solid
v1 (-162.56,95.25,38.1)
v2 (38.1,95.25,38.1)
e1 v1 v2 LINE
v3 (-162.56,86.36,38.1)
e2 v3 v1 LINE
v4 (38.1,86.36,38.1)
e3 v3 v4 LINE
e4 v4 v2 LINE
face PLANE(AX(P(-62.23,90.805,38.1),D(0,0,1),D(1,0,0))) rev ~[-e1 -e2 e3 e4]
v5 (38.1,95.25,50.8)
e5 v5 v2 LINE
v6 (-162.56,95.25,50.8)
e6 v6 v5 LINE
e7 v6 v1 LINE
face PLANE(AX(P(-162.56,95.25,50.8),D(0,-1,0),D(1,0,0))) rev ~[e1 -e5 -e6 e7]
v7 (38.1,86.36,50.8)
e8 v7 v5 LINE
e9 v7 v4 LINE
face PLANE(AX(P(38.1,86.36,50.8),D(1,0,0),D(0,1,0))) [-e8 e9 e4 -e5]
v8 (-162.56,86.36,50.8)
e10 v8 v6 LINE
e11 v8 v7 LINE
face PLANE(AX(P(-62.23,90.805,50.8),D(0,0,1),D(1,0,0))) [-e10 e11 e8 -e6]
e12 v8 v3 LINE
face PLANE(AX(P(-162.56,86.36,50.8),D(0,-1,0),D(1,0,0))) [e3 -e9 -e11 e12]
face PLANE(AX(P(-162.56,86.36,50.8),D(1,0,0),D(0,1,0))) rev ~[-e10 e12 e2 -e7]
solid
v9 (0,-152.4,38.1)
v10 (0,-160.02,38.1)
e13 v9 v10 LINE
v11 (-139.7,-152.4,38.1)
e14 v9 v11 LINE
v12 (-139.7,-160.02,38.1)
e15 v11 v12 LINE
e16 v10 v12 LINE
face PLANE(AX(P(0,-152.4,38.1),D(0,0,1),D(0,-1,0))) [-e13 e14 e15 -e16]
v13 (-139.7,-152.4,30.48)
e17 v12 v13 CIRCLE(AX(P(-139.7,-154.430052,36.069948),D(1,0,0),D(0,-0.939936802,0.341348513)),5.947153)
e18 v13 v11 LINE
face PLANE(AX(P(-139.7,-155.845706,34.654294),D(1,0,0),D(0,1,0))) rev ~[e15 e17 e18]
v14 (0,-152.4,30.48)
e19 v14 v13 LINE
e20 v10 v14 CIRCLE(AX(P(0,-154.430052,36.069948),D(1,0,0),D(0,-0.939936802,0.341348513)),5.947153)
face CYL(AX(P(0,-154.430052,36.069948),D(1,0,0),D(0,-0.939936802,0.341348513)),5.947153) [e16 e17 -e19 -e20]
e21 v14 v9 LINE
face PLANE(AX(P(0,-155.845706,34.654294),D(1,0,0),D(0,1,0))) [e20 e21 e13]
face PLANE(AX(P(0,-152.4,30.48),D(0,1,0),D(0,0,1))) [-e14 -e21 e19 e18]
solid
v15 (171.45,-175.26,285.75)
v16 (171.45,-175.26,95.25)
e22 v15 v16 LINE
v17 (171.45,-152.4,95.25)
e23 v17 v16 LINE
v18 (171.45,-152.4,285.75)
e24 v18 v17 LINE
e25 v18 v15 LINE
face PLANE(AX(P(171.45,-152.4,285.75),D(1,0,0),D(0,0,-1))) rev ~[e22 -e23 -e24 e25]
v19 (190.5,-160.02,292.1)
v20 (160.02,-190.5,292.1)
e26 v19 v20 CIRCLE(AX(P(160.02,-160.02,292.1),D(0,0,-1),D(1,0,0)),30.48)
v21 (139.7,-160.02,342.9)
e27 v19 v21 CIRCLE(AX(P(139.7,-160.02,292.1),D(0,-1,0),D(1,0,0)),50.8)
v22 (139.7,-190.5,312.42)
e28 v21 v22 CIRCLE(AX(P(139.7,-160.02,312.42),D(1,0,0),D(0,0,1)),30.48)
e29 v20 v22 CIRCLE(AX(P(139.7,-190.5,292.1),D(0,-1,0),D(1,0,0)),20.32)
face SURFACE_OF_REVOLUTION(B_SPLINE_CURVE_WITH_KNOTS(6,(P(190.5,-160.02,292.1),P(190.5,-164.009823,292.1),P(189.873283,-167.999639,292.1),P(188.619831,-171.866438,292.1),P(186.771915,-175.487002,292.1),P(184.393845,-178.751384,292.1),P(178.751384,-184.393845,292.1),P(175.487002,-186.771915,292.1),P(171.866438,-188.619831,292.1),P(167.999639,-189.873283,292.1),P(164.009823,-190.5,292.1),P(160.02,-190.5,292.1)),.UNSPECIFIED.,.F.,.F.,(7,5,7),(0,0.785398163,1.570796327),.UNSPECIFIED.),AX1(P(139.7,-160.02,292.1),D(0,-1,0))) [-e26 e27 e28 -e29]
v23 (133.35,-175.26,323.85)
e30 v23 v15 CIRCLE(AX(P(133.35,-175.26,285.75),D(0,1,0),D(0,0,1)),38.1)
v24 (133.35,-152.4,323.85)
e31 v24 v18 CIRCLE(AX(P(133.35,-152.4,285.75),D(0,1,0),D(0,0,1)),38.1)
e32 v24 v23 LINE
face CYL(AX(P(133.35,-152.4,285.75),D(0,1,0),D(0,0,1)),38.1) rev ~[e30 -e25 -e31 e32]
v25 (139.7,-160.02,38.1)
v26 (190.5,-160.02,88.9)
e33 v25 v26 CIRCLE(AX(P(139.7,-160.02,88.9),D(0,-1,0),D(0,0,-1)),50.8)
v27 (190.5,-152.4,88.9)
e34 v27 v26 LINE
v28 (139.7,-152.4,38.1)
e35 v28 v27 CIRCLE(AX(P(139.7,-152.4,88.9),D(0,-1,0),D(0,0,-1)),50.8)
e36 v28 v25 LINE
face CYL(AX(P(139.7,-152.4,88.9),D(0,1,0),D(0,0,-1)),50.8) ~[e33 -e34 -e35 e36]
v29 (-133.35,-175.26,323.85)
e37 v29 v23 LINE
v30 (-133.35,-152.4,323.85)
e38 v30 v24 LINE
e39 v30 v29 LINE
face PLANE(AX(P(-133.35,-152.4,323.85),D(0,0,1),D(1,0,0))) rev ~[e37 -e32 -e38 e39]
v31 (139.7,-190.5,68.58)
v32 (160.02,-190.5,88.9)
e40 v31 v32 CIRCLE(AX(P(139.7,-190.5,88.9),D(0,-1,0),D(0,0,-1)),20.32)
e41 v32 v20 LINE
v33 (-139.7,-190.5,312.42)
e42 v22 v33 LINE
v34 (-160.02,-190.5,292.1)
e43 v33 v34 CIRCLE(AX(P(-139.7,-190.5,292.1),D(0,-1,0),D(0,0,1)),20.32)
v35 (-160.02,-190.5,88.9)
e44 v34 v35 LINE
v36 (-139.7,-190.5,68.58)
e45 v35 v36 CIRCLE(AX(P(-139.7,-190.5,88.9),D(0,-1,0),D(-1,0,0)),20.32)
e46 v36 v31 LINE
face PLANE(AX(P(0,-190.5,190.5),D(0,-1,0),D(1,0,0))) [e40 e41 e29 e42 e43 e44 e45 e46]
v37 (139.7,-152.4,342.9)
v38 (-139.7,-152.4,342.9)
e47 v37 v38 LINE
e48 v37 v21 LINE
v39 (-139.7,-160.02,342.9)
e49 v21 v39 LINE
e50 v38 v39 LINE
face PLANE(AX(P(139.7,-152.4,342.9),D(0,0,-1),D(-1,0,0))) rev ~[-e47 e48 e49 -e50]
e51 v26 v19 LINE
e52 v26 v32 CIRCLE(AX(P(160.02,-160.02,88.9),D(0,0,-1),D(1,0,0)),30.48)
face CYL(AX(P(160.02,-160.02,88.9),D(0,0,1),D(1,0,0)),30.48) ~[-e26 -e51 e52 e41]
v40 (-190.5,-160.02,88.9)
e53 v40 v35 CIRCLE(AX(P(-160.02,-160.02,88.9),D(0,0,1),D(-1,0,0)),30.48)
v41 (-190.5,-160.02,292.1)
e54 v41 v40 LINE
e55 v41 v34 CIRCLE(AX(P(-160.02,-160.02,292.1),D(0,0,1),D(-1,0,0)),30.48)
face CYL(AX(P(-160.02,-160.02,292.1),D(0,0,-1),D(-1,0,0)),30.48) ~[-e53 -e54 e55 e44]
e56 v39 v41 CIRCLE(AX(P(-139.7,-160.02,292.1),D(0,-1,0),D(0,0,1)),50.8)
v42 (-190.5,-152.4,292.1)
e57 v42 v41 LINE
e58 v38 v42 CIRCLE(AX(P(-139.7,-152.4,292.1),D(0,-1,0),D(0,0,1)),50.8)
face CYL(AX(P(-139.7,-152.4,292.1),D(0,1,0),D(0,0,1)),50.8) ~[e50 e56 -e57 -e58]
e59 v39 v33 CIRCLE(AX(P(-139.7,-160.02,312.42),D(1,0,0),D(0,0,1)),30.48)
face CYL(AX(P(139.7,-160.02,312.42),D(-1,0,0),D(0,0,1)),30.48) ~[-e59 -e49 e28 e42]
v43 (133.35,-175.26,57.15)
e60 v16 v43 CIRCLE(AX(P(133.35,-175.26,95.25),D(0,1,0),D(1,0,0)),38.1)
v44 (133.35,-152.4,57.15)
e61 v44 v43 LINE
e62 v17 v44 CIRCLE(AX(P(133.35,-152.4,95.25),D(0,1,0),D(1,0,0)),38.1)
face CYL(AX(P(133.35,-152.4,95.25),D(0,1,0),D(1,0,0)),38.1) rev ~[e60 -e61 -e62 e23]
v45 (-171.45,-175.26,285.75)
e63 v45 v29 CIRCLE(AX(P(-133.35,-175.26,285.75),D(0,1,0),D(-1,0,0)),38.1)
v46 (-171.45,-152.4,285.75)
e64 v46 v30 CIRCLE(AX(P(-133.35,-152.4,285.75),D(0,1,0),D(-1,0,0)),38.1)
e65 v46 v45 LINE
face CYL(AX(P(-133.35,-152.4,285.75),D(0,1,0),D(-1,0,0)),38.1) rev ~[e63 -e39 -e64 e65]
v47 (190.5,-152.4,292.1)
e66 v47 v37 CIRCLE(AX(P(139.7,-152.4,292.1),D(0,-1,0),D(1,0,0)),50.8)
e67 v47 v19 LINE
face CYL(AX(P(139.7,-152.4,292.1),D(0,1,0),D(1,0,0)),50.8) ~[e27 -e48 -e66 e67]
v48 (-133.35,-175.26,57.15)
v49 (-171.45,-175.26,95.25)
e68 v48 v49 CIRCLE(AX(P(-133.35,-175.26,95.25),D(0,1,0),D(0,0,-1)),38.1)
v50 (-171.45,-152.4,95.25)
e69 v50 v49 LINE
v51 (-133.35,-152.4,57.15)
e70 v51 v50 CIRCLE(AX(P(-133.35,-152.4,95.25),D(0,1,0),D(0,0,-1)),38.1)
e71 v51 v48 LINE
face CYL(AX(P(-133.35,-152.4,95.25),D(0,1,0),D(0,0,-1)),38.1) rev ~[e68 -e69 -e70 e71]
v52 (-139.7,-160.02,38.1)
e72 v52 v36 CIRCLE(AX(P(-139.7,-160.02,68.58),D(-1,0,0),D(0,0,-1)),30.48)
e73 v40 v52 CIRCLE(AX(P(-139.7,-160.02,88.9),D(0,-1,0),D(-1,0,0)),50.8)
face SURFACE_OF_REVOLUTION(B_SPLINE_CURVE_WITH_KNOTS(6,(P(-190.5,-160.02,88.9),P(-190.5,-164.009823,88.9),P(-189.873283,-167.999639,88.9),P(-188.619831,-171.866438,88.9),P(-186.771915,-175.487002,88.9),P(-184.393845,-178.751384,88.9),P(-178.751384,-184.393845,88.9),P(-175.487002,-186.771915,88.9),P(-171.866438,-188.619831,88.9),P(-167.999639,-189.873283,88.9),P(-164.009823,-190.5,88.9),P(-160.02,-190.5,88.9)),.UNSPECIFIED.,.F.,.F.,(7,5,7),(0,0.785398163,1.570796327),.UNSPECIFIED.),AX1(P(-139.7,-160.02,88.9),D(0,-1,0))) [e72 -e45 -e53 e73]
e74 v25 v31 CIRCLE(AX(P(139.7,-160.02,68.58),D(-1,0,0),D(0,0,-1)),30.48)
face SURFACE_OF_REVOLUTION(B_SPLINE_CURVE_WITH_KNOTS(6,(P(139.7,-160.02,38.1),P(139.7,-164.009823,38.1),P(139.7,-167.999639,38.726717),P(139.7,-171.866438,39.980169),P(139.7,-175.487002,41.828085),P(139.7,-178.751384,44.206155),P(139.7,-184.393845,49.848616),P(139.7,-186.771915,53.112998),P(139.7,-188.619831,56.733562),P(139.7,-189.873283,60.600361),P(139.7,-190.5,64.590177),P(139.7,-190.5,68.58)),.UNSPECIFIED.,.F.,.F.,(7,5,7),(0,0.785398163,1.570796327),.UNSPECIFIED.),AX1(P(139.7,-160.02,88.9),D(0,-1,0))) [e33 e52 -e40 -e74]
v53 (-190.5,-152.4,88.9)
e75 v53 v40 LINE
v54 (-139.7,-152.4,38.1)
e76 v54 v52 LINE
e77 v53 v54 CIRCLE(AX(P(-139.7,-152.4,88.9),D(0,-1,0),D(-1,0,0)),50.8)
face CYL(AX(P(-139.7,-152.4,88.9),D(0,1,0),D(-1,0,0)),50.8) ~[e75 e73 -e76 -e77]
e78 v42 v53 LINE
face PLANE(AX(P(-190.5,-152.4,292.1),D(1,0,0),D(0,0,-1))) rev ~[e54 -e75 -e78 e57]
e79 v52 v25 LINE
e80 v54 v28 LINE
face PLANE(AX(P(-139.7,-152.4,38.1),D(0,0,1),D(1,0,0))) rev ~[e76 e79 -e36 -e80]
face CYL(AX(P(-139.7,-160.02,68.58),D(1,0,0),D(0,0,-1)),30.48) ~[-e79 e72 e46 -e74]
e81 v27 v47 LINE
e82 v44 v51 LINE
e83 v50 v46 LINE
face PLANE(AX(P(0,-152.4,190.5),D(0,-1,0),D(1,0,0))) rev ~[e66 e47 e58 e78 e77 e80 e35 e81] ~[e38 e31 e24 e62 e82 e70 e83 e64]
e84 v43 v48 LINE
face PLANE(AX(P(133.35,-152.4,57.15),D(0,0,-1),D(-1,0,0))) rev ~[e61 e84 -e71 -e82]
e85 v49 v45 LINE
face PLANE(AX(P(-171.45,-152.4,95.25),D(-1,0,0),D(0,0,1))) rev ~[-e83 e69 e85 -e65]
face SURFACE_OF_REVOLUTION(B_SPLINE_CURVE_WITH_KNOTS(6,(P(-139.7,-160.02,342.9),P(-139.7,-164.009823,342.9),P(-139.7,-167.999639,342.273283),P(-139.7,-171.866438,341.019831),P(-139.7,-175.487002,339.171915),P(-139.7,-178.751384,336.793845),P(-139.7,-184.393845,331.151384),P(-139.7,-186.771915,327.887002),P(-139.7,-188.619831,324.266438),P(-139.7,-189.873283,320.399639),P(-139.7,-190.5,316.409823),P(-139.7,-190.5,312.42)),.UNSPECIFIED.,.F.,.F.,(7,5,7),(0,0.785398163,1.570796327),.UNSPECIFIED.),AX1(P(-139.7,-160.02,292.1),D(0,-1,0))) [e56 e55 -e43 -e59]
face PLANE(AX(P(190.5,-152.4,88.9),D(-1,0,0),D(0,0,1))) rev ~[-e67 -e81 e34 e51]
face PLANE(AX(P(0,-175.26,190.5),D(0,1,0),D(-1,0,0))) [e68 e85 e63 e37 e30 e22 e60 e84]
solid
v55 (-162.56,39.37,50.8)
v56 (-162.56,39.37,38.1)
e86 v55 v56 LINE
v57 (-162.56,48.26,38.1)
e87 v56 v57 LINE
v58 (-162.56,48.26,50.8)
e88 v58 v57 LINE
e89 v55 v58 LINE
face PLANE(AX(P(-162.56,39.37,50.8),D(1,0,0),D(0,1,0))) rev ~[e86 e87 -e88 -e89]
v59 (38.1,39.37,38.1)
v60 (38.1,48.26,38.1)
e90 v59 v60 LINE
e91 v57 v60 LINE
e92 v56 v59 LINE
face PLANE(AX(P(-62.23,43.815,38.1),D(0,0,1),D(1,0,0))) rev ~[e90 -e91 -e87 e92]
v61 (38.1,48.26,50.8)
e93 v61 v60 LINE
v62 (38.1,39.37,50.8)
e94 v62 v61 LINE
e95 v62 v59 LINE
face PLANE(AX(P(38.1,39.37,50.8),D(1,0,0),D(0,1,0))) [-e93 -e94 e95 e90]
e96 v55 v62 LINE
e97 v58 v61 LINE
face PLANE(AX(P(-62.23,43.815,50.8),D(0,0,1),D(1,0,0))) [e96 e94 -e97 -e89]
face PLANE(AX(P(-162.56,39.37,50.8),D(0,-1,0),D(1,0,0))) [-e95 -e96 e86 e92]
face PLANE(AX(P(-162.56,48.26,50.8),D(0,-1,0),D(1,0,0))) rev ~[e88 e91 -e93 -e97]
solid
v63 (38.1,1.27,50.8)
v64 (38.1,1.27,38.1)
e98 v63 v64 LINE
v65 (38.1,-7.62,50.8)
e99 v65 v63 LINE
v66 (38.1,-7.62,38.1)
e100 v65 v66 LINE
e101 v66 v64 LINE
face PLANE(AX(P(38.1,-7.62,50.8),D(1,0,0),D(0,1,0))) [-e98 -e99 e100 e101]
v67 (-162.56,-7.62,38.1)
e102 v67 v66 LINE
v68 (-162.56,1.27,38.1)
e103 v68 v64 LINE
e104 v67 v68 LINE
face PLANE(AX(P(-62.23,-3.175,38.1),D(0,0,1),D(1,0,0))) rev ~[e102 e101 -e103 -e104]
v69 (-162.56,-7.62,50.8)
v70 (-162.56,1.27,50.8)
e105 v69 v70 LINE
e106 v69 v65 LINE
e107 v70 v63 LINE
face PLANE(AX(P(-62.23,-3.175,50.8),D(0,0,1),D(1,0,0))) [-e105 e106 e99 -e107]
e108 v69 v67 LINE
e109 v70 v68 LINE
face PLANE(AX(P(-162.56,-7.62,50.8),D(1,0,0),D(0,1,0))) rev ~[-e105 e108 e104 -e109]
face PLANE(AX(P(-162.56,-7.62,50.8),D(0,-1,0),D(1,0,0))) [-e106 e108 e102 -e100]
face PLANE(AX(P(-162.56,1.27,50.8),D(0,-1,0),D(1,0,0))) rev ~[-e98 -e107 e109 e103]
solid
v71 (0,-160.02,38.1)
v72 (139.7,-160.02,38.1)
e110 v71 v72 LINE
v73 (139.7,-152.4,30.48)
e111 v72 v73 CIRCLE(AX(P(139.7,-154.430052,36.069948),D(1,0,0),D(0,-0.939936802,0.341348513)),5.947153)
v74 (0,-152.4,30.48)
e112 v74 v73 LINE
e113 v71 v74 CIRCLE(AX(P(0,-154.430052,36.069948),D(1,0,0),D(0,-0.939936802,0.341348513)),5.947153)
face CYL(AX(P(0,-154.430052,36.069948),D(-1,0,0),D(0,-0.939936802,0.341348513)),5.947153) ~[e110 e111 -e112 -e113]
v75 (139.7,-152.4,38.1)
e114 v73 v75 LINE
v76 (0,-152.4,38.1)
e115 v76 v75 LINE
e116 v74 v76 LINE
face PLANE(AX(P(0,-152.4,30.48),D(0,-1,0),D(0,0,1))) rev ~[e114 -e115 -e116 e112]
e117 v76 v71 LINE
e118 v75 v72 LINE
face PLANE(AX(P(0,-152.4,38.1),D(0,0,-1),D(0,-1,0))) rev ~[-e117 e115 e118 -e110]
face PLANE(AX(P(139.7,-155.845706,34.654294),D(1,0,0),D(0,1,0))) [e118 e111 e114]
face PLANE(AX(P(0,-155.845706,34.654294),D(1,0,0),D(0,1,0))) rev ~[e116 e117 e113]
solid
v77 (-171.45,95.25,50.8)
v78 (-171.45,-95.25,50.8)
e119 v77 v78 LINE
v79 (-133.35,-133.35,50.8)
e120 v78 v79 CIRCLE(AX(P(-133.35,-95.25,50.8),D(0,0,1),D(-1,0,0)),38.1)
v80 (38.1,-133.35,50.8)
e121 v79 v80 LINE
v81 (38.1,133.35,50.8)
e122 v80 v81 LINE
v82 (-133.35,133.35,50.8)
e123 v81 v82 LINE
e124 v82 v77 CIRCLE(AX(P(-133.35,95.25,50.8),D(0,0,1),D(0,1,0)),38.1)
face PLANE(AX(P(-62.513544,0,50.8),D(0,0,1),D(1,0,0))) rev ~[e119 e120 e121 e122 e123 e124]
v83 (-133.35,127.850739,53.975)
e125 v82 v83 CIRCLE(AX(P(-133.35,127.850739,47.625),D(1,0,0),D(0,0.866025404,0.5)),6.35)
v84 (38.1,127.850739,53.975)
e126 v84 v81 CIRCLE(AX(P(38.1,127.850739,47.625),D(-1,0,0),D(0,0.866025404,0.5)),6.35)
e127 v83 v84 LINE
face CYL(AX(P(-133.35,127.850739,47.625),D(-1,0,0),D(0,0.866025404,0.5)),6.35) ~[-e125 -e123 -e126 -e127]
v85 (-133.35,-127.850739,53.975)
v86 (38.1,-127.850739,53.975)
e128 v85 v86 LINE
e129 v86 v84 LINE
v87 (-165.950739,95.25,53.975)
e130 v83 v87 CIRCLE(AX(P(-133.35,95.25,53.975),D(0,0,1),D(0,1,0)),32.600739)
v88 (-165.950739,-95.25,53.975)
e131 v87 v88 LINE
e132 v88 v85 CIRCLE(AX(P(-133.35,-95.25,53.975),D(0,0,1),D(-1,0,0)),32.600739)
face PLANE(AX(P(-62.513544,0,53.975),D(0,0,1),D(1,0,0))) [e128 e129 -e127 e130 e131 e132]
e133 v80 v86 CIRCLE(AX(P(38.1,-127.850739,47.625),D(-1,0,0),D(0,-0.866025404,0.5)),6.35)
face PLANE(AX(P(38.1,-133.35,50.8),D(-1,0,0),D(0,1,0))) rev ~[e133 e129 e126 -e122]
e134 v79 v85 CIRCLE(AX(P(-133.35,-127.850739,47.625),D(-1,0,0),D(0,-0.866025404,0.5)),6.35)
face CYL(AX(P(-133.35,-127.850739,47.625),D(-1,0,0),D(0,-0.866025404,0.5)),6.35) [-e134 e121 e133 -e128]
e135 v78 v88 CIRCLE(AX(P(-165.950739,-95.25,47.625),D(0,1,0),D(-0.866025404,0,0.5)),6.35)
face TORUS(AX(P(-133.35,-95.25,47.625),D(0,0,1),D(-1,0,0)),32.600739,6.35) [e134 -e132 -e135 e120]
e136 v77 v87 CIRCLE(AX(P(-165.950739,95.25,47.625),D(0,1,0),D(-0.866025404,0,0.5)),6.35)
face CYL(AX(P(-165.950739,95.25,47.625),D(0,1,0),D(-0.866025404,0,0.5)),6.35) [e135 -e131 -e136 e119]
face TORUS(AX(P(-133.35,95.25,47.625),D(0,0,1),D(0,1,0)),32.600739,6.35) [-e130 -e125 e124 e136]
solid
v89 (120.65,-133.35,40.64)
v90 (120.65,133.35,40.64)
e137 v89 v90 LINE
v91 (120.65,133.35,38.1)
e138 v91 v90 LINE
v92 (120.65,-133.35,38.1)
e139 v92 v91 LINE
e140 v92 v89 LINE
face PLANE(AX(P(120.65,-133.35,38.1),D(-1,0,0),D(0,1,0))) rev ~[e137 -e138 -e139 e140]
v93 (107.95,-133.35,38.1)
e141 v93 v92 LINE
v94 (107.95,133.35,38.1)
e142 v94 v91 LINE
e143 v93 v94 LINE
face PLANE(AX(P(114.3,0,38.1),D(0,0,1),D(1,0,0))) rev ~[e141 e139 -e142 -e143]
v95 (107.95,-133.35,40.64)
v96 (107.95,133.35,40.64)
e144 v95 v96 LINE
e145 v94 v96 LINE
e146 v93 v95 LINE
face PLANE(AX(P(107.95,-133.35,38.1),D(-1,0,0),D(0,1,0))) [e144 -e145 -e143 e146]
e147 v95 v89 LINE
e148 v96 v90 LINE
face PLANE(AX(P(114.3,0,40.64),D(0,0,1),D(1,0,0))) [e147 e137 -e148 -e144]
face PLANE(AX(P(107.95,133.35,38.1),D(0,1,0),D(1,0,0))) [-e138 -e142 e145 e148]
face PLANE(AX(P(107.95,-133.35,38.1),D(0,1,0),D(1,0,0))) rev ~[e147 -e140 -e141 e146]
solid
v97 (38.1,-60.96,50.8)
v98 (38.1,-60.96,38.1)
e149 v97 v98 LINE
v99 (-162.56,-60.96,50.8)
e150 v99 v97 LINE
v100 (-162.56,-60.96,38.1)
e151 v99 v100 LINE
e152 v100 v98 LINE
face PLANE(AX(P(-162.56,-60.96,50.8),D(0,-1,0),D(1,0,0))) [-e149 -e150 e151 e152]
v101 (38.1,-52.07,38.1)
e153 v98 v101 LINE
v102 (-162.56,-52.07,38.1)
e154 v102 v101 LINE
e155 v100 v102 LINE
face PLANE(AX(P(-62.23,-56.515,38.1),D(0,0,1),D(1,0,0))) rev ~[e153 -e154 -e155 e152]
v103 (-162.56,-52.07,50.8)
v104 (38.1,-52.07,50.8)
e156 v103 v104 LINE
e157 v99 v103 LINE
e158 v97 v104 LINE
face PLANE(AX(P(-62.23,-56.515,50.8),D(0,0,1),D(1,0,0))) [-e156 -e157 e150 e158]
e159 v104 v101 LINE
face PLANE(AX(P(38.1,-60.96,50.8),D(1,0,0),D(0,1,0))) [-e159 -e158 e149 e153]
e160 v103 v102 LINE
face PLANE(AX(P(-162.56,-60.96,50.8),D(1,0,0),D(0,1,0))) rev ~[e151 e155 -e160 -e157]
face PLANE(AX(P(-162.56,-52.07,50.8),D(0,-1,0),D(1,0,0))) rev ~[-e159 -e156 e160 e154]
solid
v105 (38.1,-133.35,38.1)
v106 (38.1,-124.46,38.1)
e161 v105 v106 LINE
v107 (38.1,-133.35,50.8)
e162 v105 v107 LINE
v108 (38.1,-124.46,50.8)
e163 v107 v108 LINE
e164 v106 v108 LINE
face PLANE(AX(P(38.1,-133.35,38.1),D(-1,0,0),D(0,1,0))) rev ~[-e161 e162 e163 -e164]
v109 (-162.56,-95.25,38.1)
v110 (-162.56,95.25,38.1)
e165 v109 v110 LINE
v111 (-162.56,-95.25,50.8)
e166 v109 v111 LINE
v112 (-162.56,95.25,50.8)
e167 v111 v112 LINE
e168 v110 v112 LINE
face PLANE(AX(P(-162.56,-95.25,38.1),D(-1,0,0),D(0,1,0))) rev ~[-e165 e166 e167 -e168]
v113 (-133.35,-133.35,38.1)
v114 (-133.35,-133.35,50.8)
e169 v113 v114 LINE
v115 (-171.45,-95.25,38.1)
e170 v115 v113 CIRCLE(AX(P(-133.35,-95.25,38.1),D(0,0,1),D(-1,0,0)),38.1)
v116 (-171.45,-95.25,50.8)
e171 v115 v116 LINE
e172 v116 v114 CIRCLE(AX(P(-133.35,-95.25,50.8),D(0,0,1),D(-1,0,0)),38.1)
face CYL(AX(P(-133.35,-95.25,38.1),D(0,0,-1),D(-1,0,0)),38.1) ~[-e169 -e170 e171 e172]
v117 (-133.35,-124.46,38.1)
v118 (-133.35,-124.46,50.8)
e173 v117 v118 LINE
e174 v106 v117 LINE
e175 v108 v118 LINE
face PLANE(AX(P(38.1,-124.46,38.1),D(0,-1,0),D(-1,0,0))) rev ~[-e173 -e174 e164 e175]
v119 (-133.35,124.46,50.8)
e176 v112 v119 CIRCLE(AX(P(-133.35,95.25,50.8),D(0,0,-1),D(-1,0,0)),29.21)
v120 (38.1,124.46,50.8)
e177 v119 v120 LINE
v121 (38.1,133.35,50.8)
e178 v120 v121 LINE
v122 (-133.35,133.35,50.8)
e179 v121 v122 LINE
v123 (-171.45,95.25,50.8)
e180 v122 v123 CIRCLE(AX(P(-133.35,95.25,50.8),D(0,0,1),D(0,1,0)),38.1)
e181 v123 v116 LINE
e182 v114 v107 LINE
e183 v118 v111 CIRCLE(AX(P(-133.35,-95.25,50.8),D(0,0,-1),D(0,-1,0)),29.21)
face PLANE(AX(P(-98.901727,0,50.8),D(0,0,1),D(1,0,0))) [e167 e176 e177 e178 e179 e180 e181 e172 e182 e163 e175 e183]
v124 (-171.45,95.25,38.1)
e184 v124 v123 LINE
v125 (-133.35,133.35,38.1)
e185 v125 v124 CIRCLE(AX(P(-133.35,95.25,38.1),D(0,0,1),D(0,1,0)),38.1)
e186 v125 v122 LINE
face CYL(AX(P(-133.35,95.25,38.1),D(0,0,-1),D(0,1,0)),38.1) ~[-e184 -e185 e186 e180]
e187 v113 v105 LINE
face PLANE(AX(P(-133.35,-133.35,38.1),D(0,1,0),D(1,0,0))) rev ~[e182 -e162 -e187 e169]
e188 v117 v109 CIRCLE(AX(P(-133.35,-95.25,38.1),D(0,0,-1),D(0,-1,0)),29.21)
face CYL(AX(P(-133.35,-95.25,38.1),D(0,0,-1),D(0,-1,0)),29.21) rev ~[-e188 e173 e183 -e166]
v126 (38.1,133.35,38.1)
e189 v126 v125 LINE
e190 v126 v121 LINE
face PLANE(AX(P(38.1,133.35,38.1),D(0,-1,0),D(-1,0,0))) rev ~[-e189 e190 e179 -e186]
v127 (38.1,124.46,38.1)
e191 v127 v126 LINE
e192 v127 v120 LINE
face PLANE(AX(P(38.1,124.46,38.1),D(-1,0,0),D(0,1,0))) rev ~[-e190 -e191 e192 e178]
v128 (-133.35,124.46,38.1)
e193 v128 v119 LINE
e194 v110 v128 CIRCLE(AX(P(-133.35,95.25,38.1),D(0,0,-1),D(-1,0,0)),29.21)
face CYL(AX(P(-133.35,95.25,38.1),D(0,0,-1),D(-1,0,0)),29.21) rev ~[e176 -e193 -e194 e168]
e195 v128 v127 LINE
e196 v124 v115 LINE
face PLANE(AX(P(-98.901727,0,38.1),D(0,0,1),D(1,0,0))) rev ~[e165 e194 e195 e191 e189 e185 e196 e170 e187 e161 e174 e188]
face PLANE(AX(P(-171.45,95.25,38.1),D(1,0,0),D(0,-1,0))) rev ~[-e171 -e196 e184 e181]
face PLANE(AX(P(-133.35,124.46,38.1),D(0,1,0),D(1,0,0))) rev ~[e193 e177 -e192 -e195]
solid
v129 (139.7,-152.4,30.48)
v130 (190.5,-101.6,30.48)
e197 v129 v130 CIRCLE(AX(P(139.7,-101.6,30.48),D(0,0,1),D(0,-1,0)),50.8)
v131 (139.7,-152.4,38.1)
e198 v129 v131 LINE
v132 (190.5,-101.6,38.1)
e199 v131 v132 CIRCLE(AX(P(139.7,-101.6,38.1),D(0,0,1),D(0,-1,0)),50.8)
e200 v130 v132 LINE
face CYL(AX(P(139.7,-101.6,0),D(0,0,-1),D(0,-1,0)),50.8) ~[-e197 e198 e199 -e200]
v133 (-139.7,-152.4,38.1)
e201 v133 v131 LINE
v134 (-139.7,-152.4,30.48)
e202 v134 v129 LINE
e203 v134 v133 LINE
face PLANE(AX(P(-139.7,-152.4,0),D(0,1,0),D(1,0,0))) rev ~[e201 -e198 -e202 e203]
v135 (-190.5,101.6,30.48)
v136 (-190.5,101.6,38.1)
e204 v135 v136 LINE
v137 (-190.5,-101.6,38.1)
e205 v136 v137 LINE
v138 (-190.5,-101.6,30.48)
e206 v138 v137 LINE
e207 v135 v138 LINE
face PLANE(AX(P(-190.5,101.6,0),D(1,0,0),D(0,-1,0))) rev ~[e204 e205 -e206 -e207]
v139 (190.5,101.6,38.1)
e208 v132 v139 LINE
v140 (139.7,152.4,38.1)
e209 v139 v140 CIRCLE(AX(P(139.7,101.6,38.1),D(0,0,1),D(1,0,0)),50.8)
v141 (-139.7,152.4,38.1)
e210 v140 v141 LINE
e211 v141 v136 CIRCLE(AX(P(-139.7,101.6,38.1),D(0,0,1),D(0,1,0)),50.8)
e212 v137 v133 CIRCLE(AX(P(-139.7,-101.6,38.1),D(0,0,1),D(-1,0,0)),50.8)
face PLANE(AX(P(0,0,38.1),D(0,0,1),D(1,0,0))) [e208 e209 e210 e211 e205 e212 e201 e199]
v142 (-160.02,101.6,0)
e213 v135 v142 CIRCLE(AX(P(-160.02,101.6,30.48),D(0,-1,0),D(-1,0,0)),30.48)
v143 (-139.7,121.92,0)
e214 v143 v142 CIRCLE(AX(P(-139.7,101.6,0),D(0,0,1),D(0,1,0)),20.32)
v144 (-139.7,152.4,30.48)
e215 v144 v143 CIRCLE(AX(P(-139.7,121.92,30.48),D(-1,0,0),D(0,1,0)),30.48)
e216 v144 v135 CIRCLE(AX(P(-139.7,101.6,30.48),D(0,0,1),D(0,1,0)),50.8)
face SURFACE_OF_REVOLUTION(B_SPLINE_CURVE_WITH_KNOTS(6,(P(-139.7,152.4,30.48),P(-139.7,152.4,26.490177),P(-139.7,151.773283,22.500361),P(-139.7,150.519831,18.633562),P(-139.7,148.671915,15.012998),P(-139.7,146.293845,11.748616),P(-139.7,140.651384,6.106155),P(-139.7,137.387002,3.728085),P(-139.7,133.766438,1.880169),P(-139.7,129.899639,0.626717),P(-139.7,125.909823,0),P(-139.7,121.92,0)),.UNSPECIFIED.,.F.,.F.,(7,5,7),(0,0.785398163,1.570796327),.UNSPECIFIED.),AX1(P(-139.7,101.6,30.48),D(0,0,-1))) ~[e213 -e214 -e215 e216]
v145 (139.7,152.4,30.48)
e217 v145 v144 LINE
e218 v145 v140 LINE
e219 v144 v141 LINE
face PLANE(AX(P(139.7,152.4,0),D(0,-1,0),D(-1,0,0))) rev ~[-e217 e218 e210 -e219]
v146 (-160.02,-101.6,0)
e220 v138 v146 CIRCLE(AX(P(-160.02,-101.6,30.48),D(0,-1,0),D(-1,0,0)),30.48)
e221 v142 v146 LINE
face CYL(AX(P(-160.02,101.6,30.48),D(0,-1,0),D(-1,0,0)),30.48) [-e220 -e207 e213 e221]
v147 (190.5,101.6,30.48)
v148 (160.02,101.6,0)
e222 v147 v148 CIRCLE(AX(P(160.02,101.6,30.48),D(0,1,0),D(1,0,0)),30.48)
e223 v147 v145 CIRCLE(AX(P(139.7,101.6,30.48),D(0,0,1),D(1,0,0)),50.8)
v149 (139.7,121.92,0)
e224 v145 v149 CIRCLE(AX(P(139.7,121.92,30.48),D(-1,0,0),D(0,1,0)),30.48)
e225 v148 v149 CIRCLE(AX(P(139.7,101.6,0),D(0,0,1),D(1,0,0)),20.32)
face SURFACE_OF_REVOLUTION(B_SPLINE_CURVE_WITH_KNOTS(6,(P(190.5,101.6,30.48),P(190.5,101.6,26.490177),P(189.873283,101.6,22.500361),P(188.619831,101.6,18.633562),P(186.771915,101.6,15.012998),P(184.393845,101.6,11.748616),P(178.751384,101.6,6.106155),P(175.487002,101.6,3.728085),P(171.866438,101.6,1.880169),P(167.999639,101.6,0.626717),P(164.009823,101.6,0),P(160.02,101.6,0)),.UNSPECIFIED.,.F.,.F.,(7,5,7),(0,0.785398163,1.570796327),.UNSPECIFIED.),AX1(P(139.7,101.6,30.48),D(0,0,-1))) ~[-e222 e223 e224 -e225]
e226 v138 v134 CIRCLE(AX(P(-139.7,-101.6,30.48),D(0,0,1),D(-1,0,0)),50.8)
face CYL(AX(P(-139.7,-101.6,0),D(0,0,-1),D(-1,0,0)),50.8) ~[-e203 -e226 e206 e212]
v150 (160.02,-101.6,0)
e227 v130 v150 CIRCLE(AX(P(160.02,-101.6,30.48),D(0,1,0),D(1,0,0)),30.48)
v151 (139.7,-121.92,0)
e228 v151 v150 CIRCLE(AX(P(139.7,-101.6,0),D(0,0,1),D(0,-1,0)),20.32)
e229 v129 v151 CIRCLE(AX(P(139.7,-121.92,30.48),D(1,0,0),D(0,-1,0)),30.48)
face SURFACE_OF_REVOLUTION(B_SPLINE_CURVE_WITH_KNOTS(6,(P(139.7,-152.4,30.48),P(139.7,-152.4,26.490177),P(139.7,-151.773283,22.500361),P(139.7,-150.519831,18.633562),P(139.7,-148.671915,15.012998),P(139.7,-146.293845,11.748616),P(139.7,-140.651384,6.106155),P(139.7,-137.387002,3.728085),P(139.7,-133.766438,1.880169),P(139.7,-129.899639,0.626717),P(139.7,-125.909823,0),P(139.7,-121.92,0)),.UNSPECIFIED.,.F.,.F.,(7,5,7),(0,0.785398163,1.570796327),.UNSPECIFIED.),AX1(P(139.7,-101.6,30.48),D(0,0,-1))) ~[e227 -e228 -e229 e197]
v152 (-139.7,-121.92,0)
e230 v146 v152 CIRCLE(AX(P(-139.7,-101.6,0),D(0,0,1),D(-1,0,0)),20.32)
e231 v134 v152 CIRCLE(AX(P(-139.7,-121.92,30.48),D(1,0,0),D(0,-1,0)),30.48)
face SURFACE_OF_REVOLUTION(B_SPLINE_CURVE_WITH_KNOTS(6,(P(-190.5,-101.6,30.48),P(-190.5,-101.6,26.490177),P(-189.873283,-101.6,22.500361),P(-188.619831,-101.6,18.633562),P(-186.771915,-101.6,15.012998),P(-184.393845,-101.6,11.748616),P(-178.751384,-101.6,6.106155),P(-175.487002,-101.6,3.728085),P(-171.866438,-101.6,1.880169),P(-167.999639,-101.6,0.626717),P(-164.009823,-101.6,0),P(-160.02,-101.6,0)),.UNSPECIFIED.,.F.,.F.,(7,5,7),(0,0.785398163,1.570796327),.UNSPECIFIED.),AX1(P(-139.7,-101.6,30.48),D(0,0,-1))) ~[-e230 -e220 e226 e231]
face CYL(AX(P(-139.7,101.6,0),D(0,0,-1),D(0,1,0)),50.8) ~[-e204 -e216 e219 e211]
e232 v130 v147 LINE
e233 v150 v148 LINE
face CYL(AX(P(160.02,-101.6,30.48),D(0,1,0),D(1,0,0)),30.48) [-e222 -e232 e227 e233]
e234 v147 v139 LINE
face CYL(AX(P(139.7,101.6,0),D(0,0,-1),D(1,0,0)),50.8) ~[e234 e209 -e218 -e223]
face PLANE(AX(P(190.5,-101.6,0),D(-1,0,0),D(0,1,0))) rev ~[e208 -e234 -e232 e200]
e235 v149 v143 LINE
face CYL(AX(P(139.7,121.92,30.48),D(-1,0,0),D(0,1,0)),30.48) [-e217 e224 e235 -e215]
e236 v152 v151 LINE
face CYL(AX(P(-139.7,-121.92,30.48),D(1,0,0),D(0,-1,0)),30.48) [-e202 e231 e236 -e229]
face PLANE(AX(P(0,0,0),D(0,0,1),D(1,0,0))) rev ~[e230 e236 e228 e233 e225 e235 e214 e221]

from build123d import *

# Parameters (mm, degrees)
F1_DEPTH     = 38.1
F2_R         = 30.48
F4_DEPTH     = 38.1
F5_R         = 30.48
F7_DEPTH     = 139.7
F8_DEPTH     = 139.7
F10_DEPTH    = 22.86
F13_DEPTH    = 12.7
F14_W        = 200.66
F14_H        = 8.89
F15_DEPTH    = 12.7
F17_DEPTH    = 3.175
F18_T1_DEPTH = 190.5
F18_T3_DEPTH = 185.1981532851
F18_T6_ANGLE = 90
F18_T8_ANGLE = 90
F19_W        = 12.7
F19_H        = 266.7
F20_DEPTH    = 2.54


# Not quite as in the source:
# - a fillet or chamfer that OpenCascade refuses, or shapes differently, is made with other operations: its cross-section is extruded or revolved along the edge and cut away or added
# - a length typed as a fraction of an inch, garbled in the dataset ("3 / 203.2 mm" for 3/8 in), is restored


with BuildPart() as f1:
    # F0 (on Top) → F1 (new body)
    with BuildSketch(Plane.XY):
        with BuildLine():
            Line((-139.7, -152.4), (139.7, -152.4))
            ThreePointArc((139.7, -152.4), (175.6210244843, -137.5210244843), (190.5, -101.6))
            Line((190.5, -101.6), (190.5, 101.6))
            ThreePointArc((190.5, 101.6), (175.6210244843, 137.5210244843), (139.7, 152.4))
            Line((139.7, 152.4), (-139.7, 152.4))
            ThreePointArc((-139.7, 152.4), (-175.6210244843, 137.5210244843), (-190.5, 101.6))
            Line((-190.5, 101.6), (-190.5, -101.6))
            ThreePointArc((-190.5, -101.6), (-175.6210244843, -137.5210244843), (-139.7, -152.4))
        make_face()
    extrude(amount=F1_DEPTH)

    # F2
    f2_edges = [f1.edges().sort_by_distance(p)[0] for p in [
        (0, -152.4, 0),
    ]]
    fillet(f2_edges, radius=F2_R)


with BuildPart() as f4:
    # F3 (on face) → F4 (new body)
    with BuildSketch(Plane.XZ.offset(152.4)):
        with BuildLine():
            Line((139.7, 342.9), (-139.7, 342.9))
            ThreePointArc((-139.7, 342.9), (-175.6210244843, 328.0210244843), (-190.5, 292.1))
            Line((-190.5, 292.1), (-190.5, 88.9))
            ThreePointArc((-190.5, 88.9), (-175.6210244843, 52.9789755157), (-139.7, 38.1))
            Line((-139.7, 38.1), (139.7, 38.1))
            ThreePointArc((139.7, 38.1), (175.6210244843, 52.9789755157), (190.5, 88.9))
            Line((190.5, 88.9), (190.5, 292.1))
            ThreePointArc((190.5, 292.1), (175.6210244843, 328.0210244843), (139.7, 342.9))
        make_face()
    extrude(amount=F4_DEPTH)

    # F5
    f5_edges = [f4.edges().sort_by_distance(p)[0] for p in [
        (-190.5, -190.5, 190.5),
        (0, -190.5, 342.9),
        (-175.621024, -190.5, 328.021024),
        (-175.621024, -190.5, 52.978976),
        (0, -190.5, 38.1),
        (175.621024, -190.5, 52.978976),
        (190.5, -190.5, 190.5),
        (175.621024, -190.5, 328.021024),
    ]]
    fillet(f5_edges, radius=F5_R)

    # F9 (on face) → F10 (cut)
    with BuildSketch(Plane(origin=(0, -152.4, 0), x_dir=(-1, 0, 0), z_dir=(0, 1, 0))):
        with BuildLine():
            Line((-133.35, 57.15), (133.35, 57.15))
            ThreePointArc((133.35, 57.15), (160.2907683632, 68.3092316368), (171.45, 95.25))
            Line((171.45, 95.25), (171.45, 285.75))
            ThreePointArc((171.45, 285.75), (160.2907683632, 312.6907683632), (133.35, 323.85))
            Line((133.35, 323.85), (-133.35, 323.85))
            ThreePointArc((-133.35, 323.85), (-160.2907683632, 312.6907683632), (-171.45, 285.75))
            Line((-171.45, 285.75), (-171.45, 95.25))
            ThreePointArc((-171.45, 95.25), (-160.2907683632, 68.3092316368), (-133.35, 57.15))
        make_face()
    extrude(amount=-F10_DEPTH, mode=Mode.SUBTRACT)


with BuildPart() as f7:
    # F6 (on Right) → F7 (new body)
    with BuildSketch(Plane.YZ):
        with BuildLine():
            Line((-152.4, 38.1), (-160.02, 38.1))
            ThreePointArc((-160.02, 38.1), (-158.6353242061, 31.8646757939), (-152.4, 30.48))
            Line((-152.4, 30.48), (-152.4, 38.1))
        make_face()
    extrude(amount=F7_DEPTH)


with BuildPart() as f8:
    # F8 (new): a face of the model
    f8_faces = [f7.part.faces().sort_by_distance(p)[0] for p in [
        (0, -156.0235310769, 34.4764689231),
    ]]
    extrude(f8_faces, amount=F8_DEPTH)


with BuildPart() as f13:
    # F12 (on face) → F13 (new body)
    with BuildSketch(Plane.XY.offset(38.1)):
        with BuildLine():
            Line((38.1, 133.35), (-133.35, 133.35))
            ThreePointArc((-133.35, 133.35), (-160.2907683632, 122.1907683632), (-171.45, 95.25))
            Line((-171.45, 95.25), (-171.45, -95.25))
            ThreePointArc((-171.45, -95.25), (-160.2907683632, -122.1907683632), (-133.35, -133.35))
            Line((-133.35, -133.35), (38.1, -133.35))
            Line((38.1, -133.35), (38.1, -124.46))
            Line((38.1, -124.46), (-133.35, -124.46))
            ThreePointArc((-133.35, -124.46), (-154.0045890785, -115.9045890785), (-162.56, -95.25))
            Line((-162.56, -95.25), (-162.56, 95.25))
            ThreePointArc((-162.56, 95.25), (-154.0045890785, 115.9045890785), (-133.35, 124.46))
            Line((-133.35, 124.46), (38.1, 124.46))
            Line((38.1, 124.46), (38.1, 133.35))
        make_face()
    extrude(amount=F13_DEPTH)


with BuildPart() as f15:
    # F14 (on face) → F15 (new body)
    with BuildSketch(Plane.XY.offset(50.8)):
        with Locations((-62.23, 90.805)):
            Rectangle(F14_W, F14_H)
    extrude(amount=-F15_DEPTH)


with BuildPart() as f15b:
    # F14 (on face) → F15, piece 2 (new body)
    with BuildSketch(Plane.XY.offset(50.8)):
        with Locations((-62.23, 43.815)):
            Rectangle(F14_W, F14_H)
    extrude(amount=-F15_DEPTH)


with BuildPart() as f15c:
    # F14 (on face) → F15, piece 3 (new body)
    with BuildSketch(Plane.XY.offset(50.8)):
        with Locations((-62.23, -3.175)):
            Rectangle(F14_W, F14_H)
    extrude(amount=-F15_DEPTH)


with BuildPart() as f15d:
    # F14 (on face) → F15, piece 4 (new body)
    with BuildSketch(Plane.XY.offset(50.8)):
        with Locations((-62.23, -56.515)):
            Rectangle(F14_W, F14_H)
    extrude(amount=-F15_DEPTH)


with BuildPart() as f17:
    # F16 (on face) → F17 (new body)
    with BuildSketch(Plane.XY.offset(50.8)):
        with BuildLine():
            Line((38.1, -133.35), (38.1, 133.35))
            Line((38.1, 133.35), (-133.35, 133.35))
            ThreePointArc((-133.35, 133.35), (-160.2907683632, 122.1907683632), (-171.45, 95.25))
            Line((-171.45, 95.25), (-171.45, -95.25))
            ThreePointArc((-171.45, -95.25), (-160.2907683632, -122.1907683632), (-133.35, -133.35))
            Line((-133.35, -133.35), (38.1, -133.35))
        make_face()
    extrude(amount=F17_DEPTH)

    # F18: fillet of radius 6.35 on 1 edges, made by hand

    # F18_s2 → F18_t1 (cut)
    with BuildSketch(Plane.XZ.offset(-95.25)):
        with BuildLine():
            ThreePointArc((-171.45, 50.8), (-169.125738686, 53.124261314), (-165.950738686, 53.975))
            Line((-165.950738686, 53.975), (-171.45, 53.975))
            Line((-171.45, 53.975), (-171.45, 50.8))
        make_face()
    extrude(amount=F18_T1_DEPTH, mode=Mode.SUBTRACT)

    # F18_s4 → F18_t3 (cut)
    with BuildSketch(Plane.YZ.offset(-133.35)):
        with BuildLine():
            ThreePointArc((-133.35, 50.8), (-131.025738686, 53.124261314), (-127.850738686, 53.975))
            Line((-127.850738686, 53.975), (-133.35, 53.975))
            Line((-133.35, 53.975), (-133.35, 50.8))
        make_face()
        with BuildLine():
            ThreePointArc((133.35, 50.8), (131.025738686, 53.124261314), (127.850738686, 53.975))
            Line((127.850738686, 53.975), (133.35, 53.975))
            Line((133.35, 53.975), (133.35, 50.8))
        make_face()
    extrude(amount=F18_T3_DEPTH, mode=Mode.SUBTRACT)

    # F18_s5 → F18_t6 (revolve, cut)
    with BuildSketch(Plane.YZ.offset(-133.35)):
        with BuildLine():
            ThreePointArc((133.35, 50.8), (131.025738686, 53.124261314), (127.850738686, 53.975))
            Line((127.850738686, 53.975), (133.35, 53.975))
            Line((133.35, 53.975), (133.35, 50.8))
        make_face()
    revolve(axis=Axis((-133.35, 95.25, 53.975), (0, 0, 1)), revolution_arc=F18_T6_ANGLE, mode=Mode.SUBTRACT)

    # F18_s7 → F18_t8 (revolve, cut)
    with BuildSketch(Plane.XZ.offset(95.25)):
        with BuildLine():
            ThreePointArc((-171.45, 50.8), (-169.125738686, 53.124261314), (-165.950738686, 53.975))
            Line((-165.950738686, 53.975), (-171.45, 53.975))
            Line((-171.45, 53.975), (-171.45, 50.8))
        make_face()
    revolve(axis=Axis((-133.35, -95.25, 53.975), (0, 0, 1)), revolution_arc=F18_T8_ANGLE, mode=Mode.SUBTRACT)


with BuildPart() as f20:
    # F19 (on face) → F20 (new body)
    with BuildSketch(Plane.XY.offset(38.1)):
        with Locations((114.3, 0)):
            Rectangle(F19_W, F19_H)
    extrude(amount=F20_DEPTH)


solid = Compound([f1.part, f4.part, f7.part, f8.part, f13.part, f15.part, f15b.part, f15c.part, f15d.part, f17.part, f20.part])
